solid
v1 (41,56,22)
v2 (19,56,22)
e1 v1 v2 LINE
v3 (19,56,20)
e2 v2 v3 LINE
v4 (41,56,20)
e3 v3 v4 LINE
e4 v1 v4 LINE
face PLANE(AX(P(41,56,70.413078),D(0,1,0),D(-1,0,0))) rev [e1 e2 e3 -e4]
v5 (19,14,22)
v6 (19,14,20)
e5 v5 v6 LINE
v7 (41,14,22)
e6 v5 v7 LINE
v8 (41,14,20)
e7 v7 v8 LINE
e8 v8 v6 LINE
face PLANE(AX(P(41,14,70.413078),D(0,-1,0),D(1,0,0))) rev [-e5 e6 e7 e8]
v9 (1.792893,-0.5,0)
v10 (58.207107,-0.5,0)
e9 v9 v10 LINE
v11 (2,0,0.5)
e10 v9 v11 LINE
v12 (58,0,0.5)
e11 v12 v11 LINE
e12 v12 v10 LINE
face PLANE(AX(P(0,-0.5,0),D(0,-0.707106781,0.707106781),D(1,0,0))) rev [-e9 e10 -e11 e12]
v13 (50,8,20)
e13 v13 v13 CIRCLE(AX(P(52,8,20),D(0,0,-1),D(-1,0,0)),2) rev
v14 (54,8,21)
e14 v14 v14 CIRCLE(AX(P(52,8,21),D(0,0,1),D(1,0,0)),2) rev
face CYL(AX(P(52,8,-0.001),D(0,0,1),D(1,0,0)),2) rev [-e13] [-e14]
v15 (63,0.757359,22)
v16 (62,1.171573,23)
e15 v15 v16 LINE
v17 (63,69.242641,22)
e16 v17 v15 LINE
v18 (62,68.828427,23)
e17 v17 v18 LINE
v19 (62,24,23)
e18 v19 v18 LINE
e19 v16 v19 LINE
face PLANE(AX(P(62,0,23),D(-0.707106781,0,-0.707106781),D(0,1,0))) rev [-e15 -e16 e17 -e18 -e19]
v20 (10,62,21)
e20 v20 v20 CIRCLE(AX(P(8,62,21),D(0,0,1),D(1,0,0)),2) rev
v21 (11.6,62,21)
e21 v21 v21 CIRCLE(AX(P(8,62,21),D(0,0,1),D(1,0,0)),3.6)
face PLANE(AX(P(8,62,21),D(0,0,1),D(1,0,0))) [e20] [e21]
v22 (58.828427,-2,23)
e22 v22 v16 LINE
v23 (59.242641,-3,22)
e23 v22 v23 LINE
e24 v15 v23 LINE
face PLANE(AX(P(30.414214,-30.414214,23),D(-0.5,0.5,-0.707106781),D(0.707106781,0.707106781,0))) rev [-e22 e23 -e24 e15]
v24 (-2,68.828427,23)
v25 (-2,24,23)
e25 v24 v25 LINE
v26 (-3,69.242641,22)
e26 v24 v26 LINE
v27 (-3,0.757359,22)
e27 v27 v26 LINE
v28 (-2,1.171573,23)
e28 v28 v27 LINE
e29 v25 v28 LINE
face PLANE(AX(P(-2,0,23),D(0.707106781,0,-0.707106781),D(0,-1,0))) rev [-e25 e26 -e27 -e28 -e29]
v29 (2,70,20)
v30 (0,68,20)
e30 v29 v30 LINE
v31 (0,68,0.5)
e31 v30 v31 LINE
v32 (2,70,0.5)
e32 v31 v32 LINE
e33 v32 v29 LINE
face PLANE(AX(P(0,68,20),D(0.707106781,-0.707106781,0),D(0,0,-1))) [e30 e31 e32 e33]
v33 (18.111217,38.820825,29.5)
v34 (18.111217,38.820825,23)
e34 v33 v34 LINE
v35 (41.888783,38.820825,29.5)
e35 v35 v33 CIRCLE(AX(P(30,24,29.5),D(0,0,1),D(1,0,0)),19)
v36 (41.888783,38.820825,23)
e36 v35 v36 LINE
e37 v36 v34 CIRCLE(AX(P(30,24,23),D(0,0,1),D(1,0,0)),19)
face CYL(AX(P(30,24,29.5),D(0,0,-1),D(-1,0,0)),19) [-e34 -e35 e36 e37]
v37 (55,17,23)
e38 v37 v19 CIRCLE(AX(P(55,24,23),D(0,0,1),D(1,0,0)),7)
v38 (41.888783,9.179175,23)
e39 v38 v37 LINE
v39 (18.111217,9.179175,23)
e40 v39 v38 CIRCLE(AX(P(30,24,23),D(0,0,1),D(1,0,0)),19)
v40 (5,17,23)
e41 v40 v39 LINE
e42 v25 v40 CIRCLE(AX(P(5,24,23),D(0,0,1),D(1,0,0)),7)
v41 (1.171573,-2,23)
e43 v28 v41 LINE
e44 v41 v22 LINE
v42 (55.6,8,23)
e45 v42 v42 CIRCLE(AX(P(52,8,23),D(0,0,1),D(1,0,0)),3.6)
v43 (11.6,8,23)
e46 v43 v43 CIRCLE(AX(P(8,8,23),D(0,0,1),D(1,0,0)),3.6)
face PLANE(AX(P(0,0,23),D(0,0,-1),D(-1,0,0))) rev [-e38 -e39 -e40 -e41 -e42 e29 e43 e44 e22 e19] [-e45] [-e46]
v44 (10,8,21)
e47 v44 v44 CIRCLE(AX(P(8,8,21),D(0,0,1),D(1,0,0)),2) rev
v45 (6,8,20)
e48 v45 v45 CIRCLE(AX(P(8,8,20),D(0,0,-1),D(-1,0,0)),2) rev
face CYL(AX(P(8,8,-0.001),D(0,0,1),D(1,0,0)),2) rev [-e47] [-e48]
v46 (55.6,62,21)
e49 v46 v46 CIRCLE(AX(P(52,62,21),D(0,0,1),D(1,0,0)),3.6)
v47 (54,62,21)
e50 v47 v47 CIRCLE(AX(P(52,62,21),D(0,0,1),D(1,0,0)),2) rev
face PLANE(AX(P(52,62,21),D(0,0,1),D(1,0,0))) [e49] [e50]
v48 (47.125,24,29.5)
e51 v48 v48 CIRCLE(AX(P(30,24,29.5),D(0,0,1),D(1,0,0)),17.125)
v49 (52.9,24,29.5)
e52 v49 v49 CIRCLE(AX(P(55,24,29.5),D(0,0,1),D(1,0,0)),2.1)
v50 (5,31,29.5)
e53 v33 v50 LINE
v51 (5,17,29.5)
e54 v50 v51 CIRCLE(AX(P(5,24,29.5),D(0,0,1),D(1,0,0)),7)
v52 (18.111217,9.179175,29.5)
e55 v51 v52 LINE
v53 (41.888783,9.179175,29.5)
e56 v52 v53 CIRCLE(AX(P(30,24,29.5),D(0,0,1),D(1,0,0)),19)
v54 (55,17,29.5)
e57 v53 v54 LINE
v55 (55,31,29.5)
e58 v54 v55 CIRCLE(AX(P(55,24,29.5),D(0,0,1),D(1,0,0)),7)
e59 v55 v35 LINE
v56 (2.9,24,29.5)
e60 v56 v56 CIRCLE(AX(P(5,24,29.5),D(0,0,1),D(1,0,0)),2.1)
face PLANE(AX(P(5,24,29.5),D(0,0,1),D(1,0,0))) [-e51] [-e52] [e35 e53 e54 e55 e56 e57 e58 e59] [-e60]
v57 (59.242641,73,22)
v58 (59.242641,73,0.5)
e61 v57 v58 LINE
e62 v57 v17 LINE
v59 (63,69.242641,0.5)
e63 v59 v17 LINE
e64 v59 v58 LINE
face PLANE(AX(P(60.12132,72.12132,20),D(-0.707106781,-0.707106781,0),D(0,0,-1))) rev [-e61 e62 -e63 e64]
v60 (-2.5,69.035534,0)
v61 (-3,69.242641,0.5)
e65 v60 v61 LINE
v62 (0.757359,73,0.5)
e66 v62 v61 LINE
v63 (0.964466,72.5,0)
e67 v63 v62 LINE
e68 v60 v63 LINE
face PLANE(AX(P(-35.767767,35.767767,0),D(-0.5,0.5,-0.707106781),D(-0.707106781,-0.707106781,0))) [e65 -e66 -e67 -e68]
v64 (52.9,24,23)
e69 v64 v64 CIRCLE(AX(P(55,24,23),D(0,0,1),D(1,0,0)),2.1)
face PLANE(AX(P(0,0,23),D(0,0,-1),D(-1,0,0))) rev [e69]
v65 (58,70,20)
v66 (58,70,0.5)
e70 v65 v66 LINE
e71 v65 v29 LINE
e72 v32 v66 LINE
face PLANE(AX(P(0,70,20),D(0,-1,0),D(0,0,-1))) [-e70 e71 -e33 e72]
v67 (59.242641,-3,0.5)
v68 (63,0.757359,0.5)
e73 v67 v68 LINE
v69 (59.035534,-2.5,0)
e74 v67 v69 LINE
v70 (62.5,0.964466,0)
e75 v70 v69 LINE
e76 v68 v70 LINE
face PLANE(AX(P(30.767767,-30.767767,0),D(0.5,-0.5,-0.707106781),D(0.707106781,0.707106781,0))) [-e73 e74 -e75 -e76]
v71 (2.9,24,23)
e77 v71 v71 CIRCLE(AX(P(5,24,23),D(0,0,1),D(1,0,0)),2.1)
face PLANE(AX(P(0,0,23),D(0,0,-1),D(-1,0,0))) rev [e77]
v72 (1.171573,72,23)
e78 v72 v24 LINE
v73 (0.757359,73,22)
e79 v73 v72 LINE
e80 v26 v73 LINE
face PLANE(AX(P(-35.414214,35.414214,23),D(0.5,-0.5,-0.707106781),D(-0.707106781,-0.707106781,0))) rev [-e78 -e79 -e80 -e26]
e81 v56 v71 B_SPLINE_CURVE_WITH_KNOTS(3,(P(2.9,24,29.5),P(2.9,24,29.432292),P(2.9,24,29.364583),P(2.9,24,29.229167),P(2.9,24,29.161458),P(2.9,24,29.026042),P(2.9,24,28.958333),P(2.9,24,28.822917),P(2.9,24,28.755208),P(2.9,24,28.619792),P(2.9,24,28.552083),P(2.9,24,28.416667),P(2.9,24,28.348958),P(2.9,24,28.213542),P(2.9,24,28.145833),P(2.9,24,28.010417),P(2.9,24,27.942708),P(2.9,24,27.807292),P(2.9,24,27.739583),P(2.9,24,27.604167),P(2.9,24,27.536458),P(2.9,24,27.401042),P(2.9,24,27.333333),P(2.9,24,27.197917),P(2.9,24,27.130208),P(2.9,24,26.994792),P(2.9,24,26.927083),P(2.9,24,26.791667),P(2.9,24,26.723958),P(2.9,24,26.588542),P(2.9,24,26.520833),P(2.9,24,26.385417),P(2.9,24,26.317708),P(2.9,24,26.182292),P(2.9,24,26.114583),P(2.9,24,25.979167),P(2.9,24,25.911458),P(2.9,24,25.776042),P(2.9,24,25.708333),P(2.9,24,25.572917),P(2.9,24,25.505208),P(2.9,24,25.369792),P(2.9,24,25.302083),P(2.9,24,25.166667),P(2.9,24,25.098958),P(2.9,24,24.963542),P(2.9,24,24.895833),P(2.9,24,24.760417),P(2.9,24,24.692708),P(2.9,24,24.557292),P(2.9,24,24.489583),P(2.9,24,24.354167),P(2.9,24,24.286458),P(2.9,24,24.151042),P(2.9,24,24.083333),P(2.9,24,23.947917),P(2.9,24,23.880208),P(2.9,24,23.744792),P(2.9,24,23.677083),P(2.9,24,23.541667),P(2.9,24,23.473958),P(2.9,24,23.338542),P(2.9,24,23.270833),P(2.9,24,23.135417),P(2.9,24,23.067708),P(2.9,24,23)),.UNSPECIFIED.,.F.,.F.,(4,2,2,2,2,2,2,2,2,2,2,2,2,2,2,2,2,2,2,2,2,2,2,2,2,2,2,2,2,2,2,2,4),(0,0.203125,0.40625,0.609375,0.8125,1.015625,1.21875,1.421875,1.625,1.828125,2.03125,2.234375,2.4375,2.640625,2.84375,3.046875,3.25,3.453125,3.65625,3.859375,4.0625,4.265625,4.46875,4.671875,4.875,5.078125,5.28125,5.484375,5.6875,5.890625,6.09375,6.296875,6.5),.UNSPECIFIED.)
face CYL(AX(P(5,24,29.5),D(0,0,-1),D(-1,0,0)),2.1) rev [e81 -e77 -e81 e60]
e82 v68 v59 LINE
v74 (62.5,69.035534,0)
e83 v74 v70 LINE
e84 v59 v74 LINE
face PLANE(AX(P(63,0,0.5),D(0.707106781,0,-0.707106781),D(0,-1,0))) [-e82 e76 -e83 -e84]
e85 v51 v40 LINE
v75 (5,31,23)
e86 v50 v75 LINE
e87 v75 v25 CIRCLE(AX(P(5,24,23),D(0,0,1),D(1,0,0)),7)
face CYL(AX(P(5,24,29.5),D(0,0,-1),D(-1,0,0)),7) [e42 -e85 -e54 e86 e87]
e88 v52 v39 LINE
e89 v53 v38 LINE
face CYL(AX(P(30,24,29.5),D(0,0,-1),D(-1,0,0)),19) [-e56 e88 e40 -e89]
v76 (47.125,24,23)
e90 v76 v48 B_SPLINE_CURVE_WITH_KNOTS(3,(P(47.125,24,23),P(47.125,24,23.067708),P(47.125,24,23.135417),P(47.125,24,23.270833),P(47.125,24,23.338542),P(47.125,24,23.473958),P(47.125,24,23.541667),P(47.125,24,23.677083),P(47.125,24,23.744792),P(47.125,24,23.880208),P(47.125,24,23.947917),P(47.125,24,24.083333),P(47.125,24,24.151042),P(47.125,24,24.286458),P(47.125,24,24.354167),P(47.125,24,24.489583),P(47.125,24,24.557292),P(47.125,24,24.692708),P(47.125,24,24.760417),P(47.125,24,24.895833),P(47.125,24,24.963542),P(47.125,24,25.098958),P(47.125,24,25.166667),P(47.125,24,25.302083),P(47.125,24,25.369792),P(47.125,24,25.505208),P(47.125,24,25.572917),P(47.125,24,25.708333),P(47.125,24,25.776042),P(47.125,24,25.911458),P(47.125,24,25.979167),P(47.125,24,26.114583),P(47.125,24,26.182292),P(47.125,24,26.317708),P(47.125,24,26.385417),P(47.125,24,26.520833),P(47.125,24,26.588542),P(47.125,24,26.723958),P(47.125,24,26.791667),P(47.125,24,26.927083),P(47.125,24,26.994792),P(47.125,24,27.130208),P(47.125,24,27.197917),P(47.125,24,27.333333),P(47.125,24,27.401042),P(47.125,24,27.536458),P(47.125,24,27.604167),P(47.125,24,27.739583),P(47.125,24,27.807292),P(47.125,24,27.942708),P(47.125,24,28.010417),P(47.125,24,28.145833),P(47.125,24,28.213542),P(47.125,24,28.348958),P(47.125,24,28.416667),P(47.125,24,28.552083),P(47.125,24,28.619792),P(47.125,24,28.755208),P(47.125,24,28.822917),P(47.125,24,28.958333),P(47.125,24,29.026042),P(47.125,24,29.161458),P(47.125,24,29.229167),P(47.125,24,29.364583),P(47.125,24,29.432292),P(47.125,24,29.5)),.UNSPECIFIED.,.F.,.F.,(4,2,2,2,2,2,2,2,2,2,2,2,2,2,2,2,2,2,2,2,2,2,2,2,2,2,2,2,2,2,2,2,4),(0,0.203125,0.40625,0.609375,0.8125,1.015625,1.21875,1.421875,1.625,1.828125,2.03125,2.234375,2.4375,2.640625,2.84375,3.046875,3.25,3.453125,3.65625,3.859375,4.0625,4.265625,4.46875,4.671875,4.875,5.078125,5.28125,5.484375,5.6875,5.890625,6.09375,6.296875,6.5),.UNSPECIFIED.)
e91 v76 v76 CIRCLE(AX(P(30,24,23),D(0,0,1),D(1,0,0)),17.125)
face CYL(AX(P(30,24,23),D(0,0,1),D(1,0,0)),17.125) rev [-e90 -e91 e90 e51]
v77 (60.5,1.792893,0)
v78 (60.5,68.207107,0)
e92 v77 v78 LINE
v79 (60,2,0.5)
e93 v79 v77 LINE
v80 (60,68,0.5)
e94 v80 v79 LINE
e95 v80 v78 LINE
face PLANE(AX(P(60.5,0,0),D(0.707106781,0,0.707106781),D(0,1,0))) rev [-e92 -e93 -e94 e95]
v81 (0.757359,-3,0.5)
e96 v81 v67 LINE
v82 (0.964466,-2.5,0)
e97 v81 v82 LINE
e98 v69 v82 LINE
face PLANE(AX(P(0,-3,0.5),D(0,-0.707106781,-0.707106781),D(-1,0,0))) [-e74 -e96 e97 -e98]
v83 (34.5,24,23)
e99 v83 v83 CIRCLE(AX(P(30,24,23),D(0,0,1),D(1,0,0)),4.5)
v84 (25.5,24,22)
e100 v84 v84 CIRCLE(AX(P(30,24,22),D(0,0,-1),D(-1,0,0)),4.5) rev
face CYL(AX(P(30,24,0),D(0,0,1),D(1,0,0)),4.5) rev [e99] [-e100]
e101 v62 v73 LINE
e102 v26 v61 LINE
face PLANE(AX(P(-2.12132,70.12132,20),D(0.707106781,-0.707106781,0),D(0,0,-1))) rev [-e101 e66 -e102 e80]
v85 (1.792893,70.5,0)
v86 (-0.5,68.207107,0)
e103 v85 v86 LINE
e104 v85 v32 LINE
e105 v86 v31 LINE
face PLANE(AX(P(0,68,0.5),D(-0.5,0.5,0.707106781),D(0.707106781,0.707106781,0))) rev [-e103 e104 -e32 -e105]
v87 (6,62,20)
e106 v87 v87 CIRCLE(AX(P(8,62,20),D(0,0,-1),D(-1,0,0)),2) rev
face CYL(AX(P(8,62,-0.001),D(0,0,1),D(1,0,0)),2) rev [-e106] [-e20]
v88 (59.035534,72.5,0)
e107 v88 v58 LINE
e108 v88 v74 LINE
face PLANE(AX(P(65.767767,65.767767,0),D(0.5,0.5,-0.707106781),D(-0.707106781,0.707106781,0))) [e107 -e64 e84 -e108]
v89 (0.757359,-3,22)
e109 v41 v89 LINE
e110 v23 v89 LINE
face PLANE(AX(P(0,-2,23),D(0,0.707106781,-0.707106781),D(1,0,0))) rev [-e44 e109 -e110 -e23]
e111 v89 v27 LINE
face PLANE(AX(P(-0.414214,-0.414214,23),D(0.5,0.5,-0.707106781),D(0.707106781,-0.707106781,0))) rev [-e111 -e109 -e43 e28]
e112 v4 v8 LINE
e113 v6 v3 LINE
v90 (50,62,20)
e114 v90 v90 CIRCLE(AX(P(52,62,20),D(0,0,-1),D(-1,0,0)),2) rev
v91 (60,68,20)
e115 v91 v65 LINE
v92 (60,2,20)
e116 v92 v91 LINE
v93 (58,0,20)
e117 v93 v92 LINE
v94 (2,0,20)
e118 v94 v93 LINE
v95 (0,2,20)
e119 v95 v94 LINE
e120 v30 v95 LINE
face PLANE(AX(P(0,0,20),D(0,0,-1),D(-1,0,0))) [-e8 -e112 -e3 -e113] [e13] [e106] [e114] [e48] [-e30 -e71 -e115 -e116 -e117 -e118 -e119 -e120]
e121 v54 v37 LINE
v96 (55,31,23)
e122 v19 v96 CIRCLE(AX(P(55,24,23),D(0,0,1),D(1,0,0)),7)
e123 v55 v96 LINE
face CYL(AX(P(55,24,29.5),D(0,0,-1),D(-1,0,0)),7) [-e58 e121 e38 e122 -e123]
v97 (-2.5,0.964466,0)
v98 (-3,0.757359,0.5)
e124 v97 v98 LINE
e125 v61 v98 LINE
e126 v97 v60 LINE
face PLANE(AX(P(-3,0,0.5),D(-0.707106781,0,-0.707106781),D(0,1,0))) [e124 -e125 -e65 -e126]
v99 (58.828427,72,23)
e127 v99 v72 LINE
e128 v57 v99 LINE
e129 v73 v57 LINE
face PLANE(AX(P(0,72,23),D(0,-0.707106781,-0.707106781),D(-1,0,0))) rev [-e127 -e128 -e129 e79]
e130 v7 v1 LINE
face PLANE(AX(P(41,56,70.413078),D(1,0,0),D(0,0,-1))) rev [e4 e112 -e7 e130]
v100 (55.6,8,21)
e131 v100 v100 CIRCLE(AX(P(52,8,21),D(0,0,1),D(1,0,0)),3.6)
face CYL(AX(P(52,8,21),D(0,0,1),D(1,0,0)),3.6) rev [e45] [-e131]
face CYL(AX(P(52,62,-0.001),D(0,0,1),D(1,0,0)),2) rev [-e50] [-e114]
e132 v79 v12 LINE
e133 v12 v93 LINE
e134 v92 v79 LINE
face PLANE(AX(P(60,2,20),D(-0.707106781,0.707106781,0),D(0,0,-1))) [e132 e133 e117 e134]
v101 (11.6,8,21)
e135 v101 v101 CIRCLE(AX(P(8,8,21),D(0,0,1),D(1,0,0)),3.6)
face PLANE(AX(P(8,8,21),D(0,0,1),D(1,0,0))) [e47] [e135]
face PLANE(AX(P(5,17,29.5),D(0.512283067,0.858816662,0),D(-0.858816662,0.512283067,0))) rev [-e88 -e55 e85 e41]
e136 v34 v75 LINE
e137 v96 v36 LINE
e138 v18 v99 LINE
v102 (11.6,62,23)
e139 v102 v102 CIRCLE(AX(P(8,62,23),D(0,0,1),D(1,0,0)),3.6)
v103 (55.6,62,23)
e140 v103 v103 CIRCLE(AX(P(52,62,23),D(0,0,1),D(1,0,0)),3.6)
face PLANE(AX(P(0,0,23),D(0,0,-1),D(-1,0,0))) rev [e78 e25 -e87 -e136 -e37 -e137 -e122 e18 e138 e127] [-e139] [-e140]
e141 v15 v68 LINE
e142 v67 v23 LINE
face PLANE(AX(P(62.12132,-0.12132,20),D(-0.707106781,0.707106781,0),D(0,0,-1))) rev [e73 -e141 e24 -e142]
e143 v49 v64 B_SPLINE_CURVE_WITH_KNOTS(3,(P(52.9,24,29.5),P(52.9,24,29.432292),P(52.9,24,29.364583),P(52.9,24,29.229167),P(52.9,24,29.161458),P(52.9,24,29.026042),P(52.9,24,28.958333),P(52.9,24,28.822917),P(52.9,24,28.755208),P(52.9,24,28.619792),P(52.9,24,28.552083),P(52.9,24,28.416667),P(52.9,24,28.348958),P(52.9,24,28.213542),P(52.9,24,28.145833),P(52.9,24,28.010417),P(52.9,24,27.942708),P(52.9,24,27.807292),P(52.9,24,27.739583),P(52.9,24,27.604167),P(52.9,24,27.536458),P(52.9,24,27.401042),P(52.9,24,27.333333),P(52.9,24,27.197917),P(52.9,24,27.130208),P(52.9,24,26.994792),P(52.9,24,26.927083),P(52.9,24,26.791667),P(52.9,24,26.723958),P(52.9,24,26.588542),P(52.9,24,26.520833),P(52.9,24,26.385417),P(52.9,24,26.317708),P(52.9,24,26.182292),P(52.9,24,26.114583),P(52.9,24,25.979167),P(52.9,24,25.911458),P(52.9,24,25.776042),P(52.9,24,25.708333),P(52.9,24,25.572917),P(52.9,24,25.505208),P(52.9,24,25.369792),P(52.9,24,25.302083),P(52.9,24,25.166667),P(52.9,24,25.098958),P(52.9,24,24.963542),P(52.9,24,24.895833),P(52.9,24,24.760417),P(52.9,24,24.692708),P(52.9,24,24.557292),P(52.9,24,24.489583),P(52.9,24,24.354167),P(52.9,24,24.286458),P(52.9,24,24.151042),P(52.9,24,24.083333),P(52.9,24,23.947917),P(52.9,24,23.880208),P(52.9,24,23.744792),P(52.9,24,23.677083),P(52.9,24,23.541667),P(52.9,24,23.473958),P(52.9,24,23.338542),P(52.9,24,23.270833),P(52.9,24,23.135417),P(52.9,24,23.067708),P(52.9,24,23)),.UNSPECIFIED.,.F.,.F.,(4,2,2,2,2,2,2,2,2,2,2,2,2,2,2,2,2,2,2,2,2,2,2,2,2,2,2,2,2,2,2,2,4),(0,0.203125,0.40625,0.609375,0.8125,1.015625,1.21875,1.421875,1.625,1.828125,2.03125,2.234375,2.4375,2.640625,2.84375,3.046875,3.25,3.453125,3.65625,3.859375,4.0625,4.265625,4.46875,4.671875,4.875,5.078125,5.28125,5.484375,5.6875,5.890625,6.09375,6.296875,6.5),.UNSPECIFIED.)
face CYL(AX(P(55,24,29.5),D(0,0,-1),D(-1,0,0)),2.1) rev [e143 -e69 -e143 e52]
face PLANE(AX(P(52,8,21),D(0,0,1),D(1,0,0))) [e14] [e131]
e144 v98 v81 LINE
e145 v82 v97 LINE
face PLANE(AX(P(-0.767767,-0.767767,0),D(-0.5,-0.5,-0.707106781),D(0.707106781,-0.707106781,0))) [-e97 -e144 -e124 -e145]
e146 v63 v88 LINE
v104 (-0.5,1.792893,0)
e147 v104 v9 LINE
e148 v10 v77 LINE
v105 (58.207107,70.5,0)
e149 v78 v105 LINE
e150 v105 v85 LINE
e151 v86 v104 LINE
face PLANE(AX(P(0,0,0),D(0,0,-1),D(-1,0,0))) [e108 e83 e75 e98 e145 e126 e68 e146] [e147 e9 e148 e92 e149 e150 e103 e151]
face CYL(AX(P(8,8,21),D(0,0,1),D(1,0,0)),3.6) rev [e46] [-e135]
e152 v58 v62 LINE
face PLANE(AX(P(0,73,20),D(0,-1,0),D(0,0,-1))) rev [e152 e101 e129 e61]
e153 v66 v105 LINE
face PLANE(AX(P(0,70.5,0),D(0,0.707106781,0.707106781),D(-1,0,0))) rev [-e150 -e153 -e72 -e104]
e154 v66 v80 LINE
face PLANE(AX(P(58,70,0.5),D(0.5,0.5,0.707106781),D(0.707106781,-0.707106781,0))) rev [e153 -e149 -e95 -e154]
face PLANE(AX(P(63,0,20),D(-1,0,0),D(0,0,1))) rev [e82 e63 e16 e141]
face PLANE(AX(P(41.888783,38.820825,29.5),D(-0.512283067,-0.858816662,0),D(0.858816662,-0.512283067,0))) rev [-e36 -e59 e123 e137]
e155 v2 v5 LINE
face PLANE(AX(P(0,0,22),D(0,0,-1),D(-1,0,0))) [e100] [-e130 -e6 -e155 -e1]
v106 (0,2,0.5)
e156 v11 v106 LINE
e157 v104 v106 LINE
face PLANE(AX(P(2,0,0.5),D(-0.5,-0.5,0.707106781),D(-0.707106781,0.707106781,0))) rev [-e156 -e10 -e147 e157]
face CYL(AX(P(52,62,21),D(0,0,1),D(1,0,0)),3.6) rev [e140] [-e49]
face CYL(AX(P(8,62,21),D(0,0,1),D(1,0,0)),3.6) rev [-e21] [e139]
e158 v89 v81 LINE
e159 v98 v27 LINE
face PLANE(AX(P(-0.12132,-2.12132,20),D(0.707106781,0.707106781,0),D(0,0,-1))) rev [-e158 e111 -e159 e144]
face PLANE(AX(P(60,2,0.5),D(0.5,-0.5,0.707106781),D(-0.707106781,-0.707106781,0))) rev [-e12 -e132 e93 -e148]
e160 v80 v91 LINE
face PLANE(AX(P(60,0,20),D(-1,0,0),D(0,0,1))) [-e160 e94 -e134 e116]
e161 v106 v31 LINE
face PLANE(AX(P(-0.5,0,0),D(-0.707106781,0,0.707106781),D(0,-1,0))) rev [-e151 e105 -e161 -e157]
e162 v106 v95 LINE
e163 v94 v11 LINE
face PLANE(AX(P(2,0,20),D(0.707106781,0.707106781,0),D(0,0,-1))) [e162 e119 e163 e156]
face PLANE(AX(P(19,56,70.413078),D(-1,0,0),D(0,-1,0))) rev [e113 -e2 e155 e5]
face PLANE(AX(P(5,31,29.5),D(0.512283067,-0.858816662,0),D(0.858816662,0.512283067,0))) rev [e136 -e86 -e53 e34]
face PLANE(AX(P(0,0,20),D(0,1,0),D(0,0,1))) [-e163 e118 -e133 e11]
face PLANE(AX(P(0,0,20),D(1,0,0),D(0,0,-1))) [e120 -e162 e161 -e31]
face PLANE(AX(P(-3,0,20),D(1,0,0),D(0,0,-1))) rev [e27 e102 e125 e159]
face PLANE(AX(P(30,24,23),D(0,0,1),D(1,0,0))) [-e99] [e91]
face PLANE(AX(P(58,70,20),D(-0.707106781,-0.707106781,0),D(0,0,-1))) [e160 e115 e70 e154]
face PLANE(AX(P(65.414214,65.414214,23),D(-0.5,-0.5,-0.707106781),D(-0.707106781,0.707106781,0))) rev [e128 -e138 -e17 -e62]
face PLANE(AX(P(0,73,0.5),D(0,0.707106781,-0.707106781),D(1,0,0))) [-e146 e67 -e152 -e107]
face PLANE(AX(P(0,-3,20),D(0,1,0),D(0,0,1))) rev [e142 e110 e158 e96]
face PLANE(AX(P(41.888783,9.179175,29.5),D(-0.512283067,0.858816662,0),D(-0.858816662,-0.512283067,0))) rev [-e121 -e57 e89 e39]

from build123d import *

# Parameters (mm, degrees)
SKIZZE1_W                       = 60
SKIZZE1_H                       = 70
GRUNDK_RPER_DEPTH               = 20
FASE1_SIZE                      = 2
WANDUNG1_T                      = 3
SKIZZE2_R                       = 4.5
DURCHBRUCH_SERVO_DEPTH          = 100.13122616
SKIZZE4_W                       = 22
SKIZZE4_H                       = 42
SERVOFREISCHNITT_DEPTH          = 2
SKIZZE3_R                       = 2.1
FLANSCHAUFSATZ_DEPTH            = 6.5
SKIZZE6_R                       = 17.125
BOHRUNGSCHNECKE_DEPTH           = 6.5
SCHNITT_LINEAR_AUSTRAGEN2_REACH = 101.131
SKIZZE7_R                       = 2
SKIZZE8_R                       = 3.6
SCHNITT_LINEAR_AUSTRAGEN3_DEPTH = 2
FASE2_SIZE                      = 1
FASE3_SIZE                      = 0.5


with BuildPart() as part:
    # Skizze1 → Grundkörper (new body)
    with BuildSketch(Plane.XY):
        with Locations((30, 35)):
            Rectangle(SKIZZE1_W, SKIZZE1_H)
    extrude(amount=GRUNDK_RPER_DEPTH)

    # Fase1
    fase1_edges = [part.edges().sort_by_distance(p)[0] for p in [
        (0, 70, 10),
        (60, 70, 10),
        (60, 0, 10),
        (0, 0, 10),
    ]]
    chamfer(fase1_edges, length=FASE1_SIZE)

    # Wandung1
    wandung1_openings = [part.faces().sort_by_distance(p)[0] for p in [
        (30, 35, 0),
    ]]
    offset(amount=WANDUNG1_T, openings=wandung1_openings, kind=Kind.INTERSECTION)

    # Skizze2 → Durchbruch Servo (cut, through all)
    with BuildSketch(Plane.XY.offset(23)):
        with Locations((30, 24)):
            Circle(SKIZZE2_R)
    extrude(amount=-DURCHBRUCH_SERVO_DEPTH, mode=Mode.SUBTRACT)

    # Skizze4 → ServoFreischnitt (cut)
    with BuildSketch(Plane(origin=(0, 0, 20), x_dir=(-1, 0, 0), z_dir=(0, 0, -1))):
        with Locations((-30, 35)):
            Rectangle(SKIZZE4_W, SKIZZE4_H)
    extrude(amount=-SERVOFREISCHNITT_DEPTH, mode=Mode.SUBTRACT)

    # Skizze3 → FlanschAufsatz (add)
    with BuildSketch(Plane.XY.offset(23)):
        with BuildLine():
            Line((5, 31), (18.11121742, 38.820824834))
            ThreePointArc((18.11121742, 38.820824834), (30, 43), (41.88878258, 38.820824834))
            Line((41.88878258, 38.820824834), (55, 31))
            ThreePointArc((55, 31), (62, 24), (55, 17))
            Line((55, 17), (41.88878258, 9.179175166))
            ThreePointArc((41.88878258, 9.179175166), (30, 5), (18.11121742, 9.179175166))
            Line((18.11121742, 9.179175166), (5, 17))
            ThreePointArc((5, 17), (-2, 24), (5, 31))
        make_face()
        with Locations(Location((5, 24, 0), (0, 0, 180))):
            Circle(SKIZZE3_R, mode=Mode.SUBTRACT)
        with Locations(Location((55, 24, 0), (0, 0, 180))):
            Circle(SKIZZE3_R, mode=Mode.SUBTRACT)
    extrude(amount=FLANSCHAUFSATZ_DEPTH)

    # Skizze6 → BohrungSchnecke (cut)
    with BuildSketch(Plane.XY.offset(29.5)):
        with Locations((30, 24)):
            Circle(SKIZZE6_R)
    extrude(amount=-BOHRUNGSCHNECKE_DEPTH, mode=Mode.SUBTRACT)

    # Skizze7 → Schnitt-Linear austragen2 (cut, up to next)
    with BuildSketch(Plane.XY.offset(23), mode=Mode.PRIVATE) as schnitt_linear_austragen2_sk1:
        with Locations((8, 62)):
            Circle(SKIZZE7_R)
    schnitt_linear_austragen2_tool1 = extrude(schnitt_linear_austragen2_sk1.sketch, amount=-SCHNITT_LINEAR_AUSTRAGEN2_REACH, mode=Mode.PRIVATE) & part.part
    # Skizze7 → Schnitt-Linear austragen2 (cut, up to next)
    with BuildSketch(Plane.XY.offset(23), mode=Mode.PRIVATE) as schnitt_linear_austragen2_sk2:
        with Locations(Location((52, 62, 0), (0, 0, 180))):
            Circle(SKIZZE7_R)
    schnitt_linear_austragen2_tool2 = extrude(schnitt_linear_austragen2_sk2.sketch, amount=-SCHNITT_LINEAR_AUSTRAGEN2_REACH, mode=Mode.PRIVATE) & part.part
    # Skizze7 → Schnitt-Linear austragen2 (cut, up to next)
    with BuildSketch(Plane.XY.offset(23), mode=Mode.PRIVATE) as schnitt_linear_austragen2_sk3:
        with Locations((52, 8)):
            Circle(SKIZZE7_R)
    schnitt_linear_austragen2_tool3 = extrude(schnitt_linear_austragen2_sk3.sketch, amount=-SCHNITT_LINEAR_AUSTRAGEN2_REACH, mode=Mode.PRIVATE) & part.part
    # Skizze7 → Schnitt-Linear austragen2 (cut, up to next)
    with BuildSketch(Plane.XY.offset(23), mode=Mode.PRIVATE) as schnitt_linear_austragen2_sk4:
        with Locations(Location((8, 8, 0), (0, 0, 180))):
            Circle(SKIZZE7_R)
    schnitt_linear_austragen2_tool4 = extrude(schnitt_linear_austragen2_sk4.sketch, amount=-SCHNITT_LINEAR_AUSTRAGEN2_REACH, mode=Mode.PRIVATE) & part.part
    add(schnitt_linear_austragen2_tool1.solids().sort_by_distance((8, 62, 23))[0], mode=Mode.SUBTRACT)
    add(schnitt_linear_austragen2_tool2.solids().sort_by_distance((52, 62, 23))[0], mode=Mode.SUBTRACT)
    add(schnitt_linear_austragen2_tool3.solids().sort_by_distance((52, 8, 23))[0], mode=Mode.SUBTRACT)
    add(schnitt_linear_austragen2_tool4.solids().sort_by_distance((8, 8, 23))[0], mode=Mode.SUBTRACT)

    # Skizze8 → Schnitt-Linear austragen3 (cut)
    with BuildSketch(Plane.XY.offset(23)):
        with Locations((8, 62)):
            Circle(SKIZZE8_R)
        with Locations((52, 62)):
            Circle(SKIZZE8_R)
        with Locations((52, 8)):
            Circle(SKIZZE8_R)
        with Locations((8, 8)):
            Circle(SKIZZE8_R)
    extrude(amount=-SCHNITT_LINEAR_AUSTRAGEN3_DEPTH, mode=Mode.SUBTRACT)

    # Fase2
    fase2_edges = [part.edges().sort_by_distance(p)[0] for p in [
        (63, 35, 23),
        (30, -3, 23),
        (-3, 35, 23),
        (30, 73, 23),
        (61.121320344, 71.121320344, 23),
        (-1.121320344, 71.121320344, 23),
        (-1.121320344, -1.121320344, 23),
        (61.121320344, -1.121320344, 23),
    ]]
    chamfer(fase2_edges, length=FASE2_SIZE - 0.0001)  # a hair under: the kernel refuses the full size

    # Fase3
    fase3_edges = [part.edges().sort_by_distance(p)[0] for p in [
        (63, 35, 0),
        (-3, 35, 0),
        (30, 73, 0),
        (30, -3, 0),
        (61.121320344, 71.121320344, 0),
        (-1.121320344, 71.121320344, 0),
        (-1.121320344, -1.121320344, 0),
        (61.121320344, -1.121320344, 0),
        (0, 35, 0),
        (30, 0, 0),
        (60, 35, 0),
        (30, 70, 0),
        (59, 1, 0),
        (1, 1, 0),
        (1, 69, 0),
        (59, 69, 0),
    ]]
    chamfer(fase3_edges, length=FASE3_SIZE)


solid = part.part
